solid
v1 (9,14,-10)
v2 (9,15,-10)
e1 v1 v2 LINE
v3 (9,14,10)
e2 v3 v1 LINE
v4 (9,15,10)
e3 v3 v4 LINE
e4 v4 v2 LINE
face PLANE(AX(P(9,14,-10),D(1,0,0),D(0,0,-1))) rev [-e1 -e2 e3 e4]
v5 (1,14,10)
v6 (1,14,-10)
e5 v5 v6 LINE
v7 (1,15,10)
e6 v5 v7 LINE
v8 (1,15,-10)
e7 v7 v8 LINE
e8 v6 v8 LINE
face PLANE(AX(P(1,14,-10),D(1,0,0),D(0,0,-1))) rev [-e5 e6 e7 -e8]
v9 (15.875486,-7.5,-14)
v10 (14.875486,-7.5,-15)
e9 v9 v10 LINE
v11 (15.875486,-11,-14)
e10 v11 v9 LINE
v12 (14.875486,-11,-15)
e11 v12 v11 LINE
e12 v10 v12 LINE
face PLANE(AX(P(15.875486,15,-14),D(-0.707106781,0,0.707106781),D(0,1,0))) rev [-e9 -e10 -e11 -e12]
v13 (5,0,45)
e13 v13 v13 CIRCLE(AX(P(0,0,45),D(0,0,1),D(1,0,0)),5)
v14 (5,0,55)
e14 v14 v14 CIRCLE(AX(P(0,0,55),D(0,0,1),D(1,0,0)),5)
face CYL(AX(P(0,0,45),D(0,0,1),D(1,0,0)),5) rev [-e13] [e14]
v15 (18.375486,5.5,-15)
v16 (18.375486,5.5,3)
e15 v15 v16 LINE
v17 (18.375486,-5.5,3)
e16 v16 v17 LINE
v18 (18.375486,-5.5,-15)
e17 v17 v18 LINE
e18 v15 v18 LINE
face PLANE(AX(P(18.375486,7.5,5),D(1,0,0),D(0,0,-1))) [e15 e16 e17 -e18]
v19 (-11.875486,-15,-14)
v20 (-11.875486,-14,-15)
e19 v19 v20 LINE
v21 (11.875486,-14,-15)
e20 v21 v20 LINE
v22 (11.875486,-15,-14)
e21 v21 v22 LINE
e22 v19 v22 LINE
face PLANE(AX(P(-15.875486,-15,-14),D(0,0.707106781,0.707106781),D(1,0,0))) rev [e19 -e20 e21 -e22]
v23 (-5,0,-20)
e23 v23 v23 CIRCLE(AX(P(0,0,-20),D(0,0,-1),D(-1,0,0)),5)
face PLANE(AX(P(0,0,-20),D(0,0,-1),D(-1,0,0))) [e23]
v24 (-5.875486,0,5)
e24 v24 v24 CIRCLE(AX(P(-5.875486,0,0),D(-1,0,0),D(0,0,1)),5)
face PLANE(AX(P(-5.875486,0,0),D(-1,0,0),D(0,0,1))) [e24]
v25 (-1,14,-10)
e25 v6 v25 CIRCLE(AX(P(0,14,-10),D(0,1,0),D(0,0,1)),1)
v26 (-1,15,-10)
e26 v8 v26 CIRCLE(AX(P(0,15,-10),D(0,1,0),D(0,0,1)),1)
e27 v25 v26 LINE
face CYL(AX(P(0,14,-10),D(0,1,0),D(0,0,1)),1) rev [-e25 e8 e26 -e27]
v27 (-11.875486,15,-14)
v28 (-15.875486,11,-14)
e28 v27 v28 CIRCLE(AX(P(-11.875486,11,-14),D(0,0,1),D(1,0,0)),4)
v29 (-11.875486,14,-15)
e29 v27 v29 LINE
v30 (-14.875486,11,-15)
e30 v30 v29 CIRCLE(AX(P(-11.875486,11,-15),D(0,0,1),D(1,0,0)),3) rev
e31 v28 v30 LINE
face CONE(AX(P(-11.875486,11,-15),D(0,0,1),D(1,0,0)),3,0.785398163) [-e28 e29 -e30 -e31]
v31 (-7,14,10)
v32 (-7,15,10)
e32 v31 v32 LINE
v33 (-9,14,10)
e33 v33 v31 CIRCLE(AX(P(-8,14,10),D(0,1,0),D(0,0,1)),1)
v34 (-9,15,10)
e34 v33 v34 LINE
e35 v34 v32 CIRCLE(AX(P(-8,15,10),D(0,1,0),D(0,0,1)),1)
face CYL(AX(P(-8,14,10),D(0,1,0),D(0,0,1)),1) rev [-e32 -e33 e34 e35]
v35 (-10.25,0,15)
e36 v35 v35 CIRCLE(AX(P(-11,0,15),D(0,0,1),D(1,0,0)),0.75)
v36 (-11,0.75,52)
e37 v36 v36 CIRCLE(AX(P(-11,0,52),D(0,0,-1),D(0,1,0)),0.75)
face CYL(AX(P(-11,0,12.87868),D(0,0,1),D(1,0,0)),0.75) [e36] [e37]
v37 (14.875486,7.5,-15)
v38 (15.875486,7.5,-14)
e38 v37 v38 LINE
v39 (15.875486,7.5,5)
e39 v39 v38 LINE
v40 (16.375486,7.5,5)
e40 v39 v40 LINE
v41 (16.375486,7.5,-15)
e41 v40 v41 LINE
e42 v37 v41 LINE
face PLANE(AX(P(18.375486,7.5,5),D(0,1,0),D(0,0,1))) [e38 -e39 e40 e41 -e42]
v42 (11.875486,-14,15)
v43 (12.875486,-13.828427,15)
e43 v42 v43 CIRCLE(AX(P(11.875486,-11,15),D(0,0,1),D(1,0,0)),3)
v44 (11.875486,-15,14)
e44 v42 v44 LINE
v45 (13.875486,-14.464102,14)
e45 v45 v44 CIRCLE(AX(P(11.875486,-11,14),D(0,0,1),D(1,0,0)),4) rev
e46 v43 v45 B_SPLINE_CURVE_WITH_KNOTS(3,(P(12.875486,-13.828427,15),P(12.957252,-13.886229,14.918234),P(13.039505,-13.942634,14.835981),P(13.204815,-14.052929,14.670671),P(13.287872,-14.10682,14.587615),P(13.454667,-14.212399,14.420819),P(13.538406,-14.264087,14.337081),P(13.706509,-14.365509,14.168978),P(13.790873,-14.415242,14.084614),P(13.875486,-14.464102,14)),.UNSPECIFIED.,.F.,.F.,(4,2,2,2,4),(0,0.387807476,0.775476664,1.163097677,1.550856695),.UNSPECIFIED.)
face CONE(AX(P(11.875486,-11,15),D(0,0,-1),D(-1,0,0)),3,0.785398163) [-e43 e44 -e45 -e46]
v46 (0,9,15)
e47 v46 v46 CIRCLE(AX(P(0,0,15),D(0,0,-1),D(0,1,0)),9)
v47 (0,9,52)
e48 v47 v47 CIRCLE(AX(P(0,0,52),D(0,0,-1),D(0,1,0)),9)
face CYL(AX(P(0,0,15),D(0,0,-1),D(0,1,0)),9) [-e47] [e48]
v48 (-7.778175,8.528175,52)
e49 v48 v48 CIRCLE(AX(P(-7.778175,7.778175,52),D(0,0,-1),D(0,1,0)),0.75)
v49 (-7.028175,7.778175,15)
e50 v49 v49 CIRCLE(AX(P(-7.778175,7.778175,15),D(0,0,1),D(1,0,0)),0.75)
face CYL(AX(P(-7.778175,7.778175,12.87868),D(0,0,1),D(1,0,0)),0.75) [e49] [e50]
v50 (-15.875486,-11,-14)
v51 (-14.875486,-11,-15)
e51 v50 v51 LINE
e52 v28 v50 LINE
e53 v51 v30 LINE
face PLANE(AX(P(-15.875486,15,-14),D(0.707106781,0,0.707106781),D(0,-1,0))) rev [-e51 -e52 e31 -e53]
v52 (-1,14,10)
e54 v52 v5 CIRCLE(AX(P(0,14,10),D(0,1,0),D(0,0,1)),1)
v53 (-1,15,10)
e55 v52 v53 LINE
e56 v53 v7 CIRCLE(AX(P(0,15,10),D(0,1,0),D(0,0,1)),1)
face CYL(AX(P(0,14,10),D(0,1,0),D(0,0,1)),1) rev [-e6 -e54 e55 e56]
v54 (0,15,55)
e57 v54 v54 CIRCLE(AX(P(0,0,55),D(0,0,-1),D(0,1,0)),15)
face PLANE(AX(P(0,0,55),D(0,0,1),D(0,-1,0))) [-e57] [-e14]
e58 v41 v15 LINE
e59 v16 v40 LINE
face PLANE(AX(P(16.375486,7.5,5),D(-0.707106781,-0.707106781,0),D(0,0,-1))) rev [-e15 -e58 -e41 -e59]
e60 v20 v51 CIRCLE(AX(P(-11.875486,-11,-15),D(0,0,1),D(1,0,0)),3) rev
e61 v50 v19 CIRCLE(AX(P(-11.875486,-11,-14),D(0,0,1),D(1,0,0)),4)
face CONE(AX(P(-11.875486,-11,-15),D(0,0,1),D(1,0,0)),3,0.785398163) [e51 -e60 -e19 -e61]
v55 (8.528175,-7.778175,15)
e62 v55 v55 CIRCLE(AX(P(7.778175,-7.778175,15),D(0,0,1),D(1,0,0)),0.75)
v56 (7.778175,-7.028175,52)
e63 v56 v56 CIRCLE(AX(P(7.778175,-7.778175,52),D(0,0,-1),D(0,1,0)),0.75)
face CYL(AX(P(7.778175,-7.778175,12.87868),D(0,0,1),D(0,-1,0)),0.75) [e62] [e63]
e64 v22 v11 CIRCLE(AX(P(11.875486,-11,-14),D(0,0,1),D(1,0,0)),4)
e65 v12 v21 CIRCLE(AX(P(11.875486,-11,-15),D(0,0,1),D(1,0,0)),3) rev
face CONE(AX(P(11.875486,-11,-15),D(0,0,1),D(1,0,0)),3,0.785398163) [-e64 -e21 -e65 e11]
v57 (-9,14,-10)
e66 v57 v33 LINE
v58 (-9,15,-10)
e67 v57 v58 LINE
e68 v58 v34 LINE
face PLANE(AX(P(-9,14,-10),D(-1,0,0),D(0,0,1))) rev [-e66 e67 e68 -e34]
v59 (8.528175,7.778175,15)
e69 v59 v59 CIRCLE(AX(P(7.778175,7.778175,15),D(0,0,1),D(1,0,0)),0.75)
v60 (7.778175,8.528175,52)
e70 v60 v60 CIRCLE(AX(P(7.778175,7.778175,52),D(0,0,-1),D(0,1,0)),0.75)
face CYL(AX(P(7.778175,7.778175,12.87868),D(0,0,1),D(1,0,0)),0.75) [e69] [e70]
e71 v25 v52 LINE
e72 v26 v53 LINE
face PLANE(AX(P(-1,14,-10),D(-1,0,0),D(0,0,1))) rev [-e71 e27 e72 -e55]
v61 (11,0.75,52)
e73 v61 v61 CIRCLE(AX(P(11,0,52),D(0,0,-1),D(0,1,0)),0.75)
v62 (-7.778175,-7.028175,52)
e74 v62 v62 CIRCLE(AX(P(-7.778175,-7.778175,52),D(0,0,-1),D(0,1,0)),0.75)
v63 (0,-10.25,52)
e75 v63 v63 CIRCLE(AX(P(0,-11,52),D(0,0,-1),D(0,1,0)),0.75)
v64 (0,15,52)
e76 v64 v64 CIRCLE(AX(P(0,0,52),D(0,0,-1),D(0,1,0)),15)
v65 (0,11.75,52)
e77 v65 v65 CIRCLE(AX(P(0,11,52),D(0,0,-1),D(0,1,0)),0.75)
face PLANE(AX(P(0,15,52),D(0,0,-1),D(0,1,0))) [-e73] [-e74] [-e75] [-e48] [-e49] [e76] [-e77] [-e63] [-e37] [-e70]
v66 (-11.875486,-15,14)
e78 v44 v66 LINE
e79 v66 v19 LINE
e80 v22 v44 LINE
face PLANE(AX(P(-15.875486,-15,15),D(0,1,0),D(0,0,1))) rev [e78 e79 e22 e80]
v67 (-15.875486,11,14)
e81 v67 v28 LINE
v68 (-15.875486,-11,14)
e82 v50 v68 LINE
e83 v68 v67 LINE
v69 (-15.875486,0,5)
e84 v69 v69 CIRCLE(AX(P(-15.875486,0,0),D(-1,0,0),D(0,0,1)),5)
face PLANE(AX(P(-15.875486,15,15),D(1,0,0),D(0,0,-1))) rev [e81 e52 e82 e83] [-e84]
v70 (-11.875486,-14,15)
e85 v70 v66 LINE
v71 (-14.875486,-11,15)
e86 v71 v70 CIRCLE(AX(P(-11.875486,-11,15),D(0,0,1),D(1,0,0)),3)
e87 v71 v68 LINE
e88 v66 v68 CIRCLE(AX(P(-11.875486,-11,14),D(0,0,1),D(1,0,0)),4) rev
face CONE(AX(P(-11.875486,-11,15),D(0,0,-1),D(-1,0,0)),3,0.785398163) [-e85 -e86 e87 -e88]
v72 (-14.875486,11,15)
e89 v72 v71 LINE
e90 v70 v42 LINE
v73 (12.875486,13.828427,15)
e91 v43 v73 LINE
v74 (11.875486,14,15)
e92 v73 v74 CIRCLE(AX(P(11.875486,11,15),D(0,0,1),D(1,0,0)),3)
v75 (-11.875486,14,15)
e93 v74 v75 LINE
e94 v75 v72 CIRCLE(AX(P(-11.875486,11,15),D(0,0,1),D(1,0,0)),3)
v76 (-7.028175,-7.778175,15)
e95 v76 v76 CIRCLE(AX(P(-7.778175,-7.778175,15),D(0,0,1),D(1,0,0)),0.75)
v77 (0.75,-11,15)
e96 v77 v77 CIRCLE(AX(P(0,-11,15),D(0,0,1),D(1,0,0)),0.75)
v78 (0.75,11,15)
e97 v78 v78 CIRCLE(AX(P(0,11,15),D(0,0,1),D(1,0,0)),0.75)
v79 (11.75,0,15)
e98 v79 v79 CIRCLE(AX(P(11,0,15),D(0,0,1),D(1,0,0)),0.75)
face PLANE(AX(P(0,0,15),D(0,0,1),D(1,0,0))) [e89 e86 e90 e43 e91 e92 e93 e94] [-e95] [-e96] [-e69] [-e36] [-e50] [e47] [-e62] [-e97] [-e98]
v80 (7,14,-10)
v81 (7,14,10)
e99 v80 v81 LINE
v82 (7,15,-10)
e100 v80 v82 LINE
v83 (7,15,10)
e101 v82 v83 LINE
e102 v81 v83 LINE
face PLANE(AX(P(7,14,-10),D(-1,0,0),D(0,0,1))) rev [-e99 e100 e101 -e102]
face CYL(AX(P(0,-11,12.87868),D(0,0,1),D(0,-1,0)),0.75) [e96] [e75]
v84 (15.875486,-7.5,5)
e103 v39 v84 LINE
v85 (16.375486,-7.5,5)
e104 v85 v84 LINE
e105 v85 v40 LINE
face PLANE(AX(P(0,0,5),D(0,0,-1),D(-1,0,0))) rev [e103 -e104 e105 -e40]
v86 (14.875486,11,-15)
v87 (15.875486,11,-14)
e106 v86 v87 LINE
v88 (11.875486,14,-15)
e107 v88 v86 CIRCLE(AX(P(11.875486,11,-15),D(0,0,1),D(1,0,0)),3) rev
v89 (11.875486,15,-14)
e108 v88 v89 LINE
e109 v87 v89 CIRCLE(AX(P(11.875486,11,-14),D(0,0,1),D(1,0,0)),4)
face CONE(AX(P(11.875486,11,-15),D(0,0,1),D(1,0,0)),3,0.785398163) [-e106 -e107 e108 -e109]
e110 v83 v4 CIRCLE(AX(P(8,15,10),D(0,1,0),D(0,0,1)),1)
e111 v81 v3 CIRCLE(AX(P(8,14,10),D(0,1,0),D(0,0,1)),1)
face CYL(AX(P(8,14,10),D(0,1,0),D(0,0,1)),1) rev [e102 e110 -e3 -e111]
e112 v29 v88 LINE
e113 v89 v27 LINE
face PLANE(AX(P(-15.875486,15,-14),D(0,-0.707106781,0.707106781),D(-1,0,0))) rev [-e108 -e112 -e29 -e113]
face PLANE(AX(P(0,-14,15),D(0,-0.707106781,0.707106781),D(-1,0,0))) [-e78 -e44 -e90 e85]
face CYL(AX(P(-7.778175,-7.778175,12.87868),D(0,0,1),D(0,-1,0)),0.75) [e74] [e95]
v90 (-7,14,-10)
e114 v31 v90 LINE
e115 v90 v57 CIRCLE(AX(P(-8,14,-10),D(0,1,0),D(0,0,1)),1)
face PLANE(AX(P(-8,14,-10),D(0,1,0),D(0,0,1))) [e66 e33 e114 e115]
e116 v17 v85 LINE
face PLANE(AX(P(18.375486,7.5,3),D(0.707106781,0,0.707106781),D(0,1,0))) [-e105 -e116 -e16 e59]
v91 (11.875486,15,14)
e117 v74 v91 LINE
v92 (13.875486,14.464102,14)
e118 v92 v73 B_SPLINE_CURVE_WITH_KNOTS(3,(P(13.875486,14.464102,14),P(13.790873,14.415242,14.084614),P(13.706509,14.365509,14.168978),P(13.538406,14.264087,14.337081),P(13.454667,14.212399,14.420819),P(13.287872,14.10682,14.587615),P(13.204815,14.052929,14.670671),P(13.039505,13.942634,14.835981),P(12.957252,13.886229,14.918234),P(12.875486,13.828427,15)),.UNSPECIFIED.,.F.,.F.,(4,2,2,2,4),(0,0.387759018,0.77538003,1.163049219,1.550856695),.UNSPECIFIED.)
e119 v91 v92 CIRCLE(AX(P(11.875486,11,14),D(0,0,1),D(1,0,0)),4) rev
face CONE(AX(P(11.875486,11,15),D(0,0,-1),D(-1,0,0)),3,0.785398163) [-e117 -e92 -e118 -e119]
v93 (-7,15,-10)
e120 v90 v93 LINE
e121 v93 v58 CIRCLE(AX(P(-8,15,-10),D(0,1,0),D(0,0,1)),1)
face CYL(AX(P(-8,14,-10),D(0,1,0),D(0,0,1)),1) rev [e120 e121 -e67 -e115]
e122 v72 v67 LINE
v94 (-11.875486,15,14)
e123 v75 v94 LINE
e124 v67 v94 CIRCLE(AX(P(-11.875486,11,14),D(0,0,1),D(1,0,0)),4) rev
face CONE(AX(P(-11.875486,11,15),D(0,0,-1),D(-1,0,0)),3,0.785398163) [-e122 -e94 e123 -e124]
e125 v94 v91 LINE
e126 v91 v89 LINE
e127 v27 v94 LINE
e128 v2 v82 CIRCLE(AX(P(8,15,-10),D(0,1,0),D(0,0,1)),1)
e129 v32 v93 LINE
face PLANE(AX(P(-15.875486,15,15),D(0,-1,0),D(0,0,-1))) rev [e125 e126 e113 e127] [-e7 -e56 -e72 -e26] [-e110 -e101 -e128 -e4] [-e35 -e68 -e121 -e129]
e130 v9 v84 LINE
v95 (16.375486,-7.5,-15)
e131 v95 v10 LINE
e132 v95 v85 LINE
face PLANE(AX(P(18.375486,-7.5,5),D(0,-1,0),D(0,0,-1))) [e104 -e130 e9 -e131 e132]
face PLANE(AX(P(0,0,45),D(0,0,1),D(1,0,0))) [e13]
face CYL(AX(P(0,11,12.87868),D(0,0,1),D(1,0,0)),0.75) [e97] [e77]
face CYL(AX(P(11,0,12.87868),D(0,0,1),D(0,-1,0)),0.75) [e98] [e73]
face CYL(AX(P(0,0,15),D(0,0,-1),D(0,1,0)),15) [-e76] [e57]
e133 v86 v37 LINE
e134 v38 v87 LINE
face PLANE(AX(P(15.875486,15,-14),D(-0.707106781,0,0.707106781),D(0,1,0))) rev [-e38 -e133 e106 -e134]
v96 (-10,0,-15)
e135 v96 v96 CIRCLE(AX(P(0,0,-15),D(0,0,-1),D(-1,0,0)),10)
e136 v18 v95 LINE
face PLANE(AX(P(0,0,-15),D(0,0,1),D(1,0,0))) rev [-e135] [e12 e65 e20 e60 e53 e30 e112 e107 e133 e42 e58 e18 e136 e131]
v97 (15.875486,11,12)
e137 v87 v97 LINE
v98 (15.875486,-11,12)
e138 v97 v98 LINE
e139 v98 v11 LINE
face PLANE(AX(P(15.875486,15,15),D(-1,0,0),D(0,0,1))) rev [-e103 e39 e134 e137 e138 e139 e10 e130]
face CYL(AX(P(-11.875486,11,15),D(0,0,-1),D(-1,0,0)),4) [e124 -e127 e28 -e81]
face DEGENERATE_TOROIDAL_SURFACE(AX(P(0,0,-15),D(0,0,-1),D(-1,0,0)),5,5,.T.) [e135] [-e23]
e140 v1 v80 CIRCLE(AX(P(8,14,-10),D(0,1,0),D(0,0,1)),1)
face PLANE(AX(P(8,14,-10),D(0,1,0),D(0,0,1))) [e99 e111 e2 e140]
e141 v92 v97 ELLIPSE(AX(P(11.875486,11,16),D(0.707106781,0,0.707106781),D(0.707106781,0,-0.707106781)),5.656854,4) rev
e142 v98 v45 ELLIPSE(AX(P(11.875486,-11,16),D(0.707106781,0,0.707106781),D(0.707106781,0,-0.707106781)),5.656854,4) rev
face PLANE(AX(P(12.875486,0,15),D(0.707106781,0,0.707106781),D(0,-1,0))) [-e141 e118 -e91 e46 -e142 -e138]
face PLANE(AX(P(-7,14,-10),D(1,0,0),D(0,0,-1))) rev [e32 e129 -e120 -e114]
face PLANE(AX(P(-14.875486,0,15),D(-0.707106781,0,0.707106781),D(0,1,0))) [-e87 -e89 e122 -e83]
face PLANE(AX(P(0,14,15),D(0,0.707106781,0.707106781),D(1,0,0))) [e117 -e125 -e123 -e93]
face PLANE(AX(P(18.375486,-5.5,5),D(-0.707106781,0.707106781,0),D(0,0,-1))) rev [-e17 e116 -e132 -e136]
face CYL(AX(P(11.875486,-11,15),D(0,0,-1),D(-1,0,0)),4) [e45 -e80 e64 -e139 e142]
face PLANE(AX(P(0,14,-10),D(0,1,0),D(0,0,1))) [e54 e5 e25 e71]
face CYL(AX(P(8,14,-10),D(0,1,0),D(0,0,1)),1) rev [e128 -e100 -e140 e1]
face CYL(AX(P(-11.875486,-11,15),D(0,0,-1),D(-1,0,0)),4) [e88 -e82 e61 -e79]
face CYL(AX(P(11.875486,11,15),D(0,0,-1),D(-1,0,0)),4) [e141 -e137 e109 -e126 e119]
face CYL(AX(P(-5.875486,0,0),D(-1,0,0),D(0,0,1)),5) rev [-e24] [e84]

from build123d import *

# Parameters (mm, degrees)
SKETCH2_W           = 31.750972762
SKETCH2_H           = 30
BOSS_EXTRUDE1_DEPTH = 15
FILLET1_R           = 4
CHAMFER1_SIZE       = 3
CHAMFER2_SIZE       = 1
SKETCH4_R           = 10
BOSS_EXTRUDE2_DEPTH = 5
FILLET2_R           = 5
SKETCH5_W           = 5
SKETCH5_H           = 15
BOSS_EXTRUDE3_DEPTH = 20
CHAMFER3_SIZE       = 2
SKETCH6_R           = 5
CUT_EXTRUDE1_DEPTH  = 10
SKETCH7_R           = 0.75
BOSS_EXTRUDE4_DEPTH = 40
CIRPATTERN2_COUNT   = 8
SKETCH8_R           = 5
CUT_EXTRUDE2_DEPTH  = 10
CUT_EXTRUDE3_DEPTH  = 1
LPATTERN3_COUNT     = 2
LPATTERN3_PITCH     = 8
LPATTERN3_COL_COUNT = 2
LPATTERN3_COL_PITCH = 8


# Some blends are built 0.0001 mm under size
with BuildPart() as part:
    # Sketch2 → Boss-Extrude1 (new, symmetric)
    with BuildSketch(Plane.XY):
        Rectangle(SKETCH2_W, SKETCH2_H)
    extrude(amount=BOSS_EXTRUDE1_DEPTH, both=True)

    # Sketch3 → Revolve1 (revolve)
    with BuildSketch(Plane(origin=(0, 0, 0), x_dir=(0, 0, -1), z_dir=(1, 0, 0))):
        Polygon((-55, 0), (-55, 15), (-52, 15), (-52, 9), (-15, 9), (-15, 0), align=None)
    revolve(axis=Axis((0, 0, 15), (0, 0, 1)))

    # Fillet1
    fillet1_edges = [part.edges().sort_by_distance(p)[0] for p in [
        (15.875486381, -15, 0),
        (-15.875486381, -15, 0),
        (-15.875486381, 15, 0),
        (15.875486381, 15, 0),
    ]]
    fillet(fillet1_edges, radius=FILLET1_R)

    # Chamfer1
    # the kernel refuses this chamfer: 3 mm, written as the material it takes off along each edge
    with BuildSketch(Plane(origin=(15.875486381, 18.715048964, 15), x_dir=(-0.9996219169112969, 0, 0.02749587661058621), z_dir=(0, -1, 0))) as chamfer1_piece_1:
        Polygon((CHAMFER1_SIZE * 0.999621916911, CHAMFER1_SIZE * 0.0274958766106), (-CHAMFER1_SIZE * 0.0274958766106, CHAMFER1_SIZE * 0.999621916911), (0, 0), align=None)
    extrude(amount=37.430097928, mode=Mode.SUBTRACT)

    # Chamfer2
    chamfer2_edges = [part.edges().sort_by_distance(p)[0] for p in [
        (0, -15, -15),
        (14.703913506, -13.828427125, -15),
        (-14.703913506, -13.828427125, -15),
        (15.875486381, 0, -15),
        (-15.875486381, 0, -15),
        (14.703913506, 13.828427125, -15),
        (-14.703913506, 13.828427125, -15),
        (0, 15, -15),
        (12.379503551, -14.968118785, 15),
        (0, -15, 15),
        (-14.703913506, -13.828427125, 15),
        (-15.875486381, 0, 15),
        (12.379503551, 14.968118785, 15),
        (-14.703913506, 13.828427125, 15),
        (0, 15, 15),
    ]]
    chamfer(chamfer2_edges, length=CHAMFER2_SIZE)

    # Sketch4 → Boss-Extrude2 (add)
    with BuildSketch(Plane(origin=(0, 0, -15), x_dir=(-1, 0, 0), z_dir=(0, 0, -1))):
        Circle(SKETCH4_R)
    extrude(amount=BOSS_EXTRUDE2_DEPTH)

    # Fillet2
    fillet2_edges = [part.edges().sort_by_distance(p)[0] for p in [
        (10, 0, -20),
    ]]
    fillet(fillet2_edges, radius=FILLET2_R - 0.0001)  # a hair under: the kernel refuses the full size

    # Sketch5 → Boss-Extrude3 (add)
    with BuildSketch(Plane(origin=(0, 0, -15), x_dir=(-1, 0, 0), z_dir=(0, 0, -1))):
        with Locations((-15.875486381, 0)):
            Rectangle(SKETCH5_W, SKETCH5_H)
    extrude(amount=-BOSS_EXTRUDE3_DEPTH)

    # Chamfer3
    chamfer3_edges = [part.edges().sort_by_distance(p)[0] for p in [
        (18.375486381, 7.5, -5),
        (18.375486381, 0, 5),
        (18.375486381, -7.5, -5),
    ]]
    chamfer(chamfer3_edges, length=CHAMFER3_SIZE)

    # Sketch6 → Cut-Extrude1 (cut)
    with BuildSketch(Plane.XY.offset(55)):
        Circle(SKETCH6_R)
    extrude(amount=-CUT_EXTRUDE1_DEPTH, mode=Mode.SUBTRACT)

    # Sketch7 → Boss-Extrude4 (add)
    with BuildSketch(Plane.XY.offset(55)):
        with Locations((0, 11)):
            Circle(SKETCH7_R)
    boss_extrude4 = extrude(amount=-BOSS_EXTRUDE4_DEPTH)

    # CirPattern2: Boss-Extrude4 ×8 about axis
    cirpattern2_axis = Axis((0, 0, 0), (0, 0, 1))
    for i in range(1, CIRPATTERN2_COUNT):
        add(boss_extrude4.rotate(cirpattern2_axis, i * 360 / CIRPATTERN2_COUNT))

    # Sketch8 → Cut-Extrude2 (cut)
    with BuildSketch(Plane.ZY.offset(15.875486381)):
        Circle(SKETCH8_R)
    extrude(amount=-CUT_EXTRUDE2_DEPTH, mode=Mode.SUBTRACT)

    # Sketch9 → Cut-Extrude3 (cut)
    with BuildSketch(Plane(origin=(0, 15, 0), x_dir=(1, 0, 0), z_dir=(0, 1, 0))):
        with BuildLine():
            Line((1, 10), (1, -10))
            ThreePointArc((1, -10), (0, -11), (-1, -10))
            Line((-1, -10), (-1, 10))
            ThreePointArc((-1, 10), (0, 11), (1, 10))
        make_face()
    cut_extrude3 = extrude(amount=-CUT_EXTRUDE3_DEPTH, mode=Mode.SUBTRACT)

    # LPattern3: Cut-Extrude3 ×2
    with Locations(*[(-i * LPATTERN3_PITCH, 0, 0) for i in range(1, LPATTERN3_COUNT)]):
        add(cut_extrude3, mode=Mode.SUBTRACT)

    # LPattern3 col: Cut-Extrude3 ×2
    with Locations(*[(i * LPATTERN3_COL_PITCH, 0, 0) for i in range(1, LPATTERN3_COL_COUNT)]):
        add(cut_extrude3, mode=Mode.SUBTRACT)


solid = part.part
